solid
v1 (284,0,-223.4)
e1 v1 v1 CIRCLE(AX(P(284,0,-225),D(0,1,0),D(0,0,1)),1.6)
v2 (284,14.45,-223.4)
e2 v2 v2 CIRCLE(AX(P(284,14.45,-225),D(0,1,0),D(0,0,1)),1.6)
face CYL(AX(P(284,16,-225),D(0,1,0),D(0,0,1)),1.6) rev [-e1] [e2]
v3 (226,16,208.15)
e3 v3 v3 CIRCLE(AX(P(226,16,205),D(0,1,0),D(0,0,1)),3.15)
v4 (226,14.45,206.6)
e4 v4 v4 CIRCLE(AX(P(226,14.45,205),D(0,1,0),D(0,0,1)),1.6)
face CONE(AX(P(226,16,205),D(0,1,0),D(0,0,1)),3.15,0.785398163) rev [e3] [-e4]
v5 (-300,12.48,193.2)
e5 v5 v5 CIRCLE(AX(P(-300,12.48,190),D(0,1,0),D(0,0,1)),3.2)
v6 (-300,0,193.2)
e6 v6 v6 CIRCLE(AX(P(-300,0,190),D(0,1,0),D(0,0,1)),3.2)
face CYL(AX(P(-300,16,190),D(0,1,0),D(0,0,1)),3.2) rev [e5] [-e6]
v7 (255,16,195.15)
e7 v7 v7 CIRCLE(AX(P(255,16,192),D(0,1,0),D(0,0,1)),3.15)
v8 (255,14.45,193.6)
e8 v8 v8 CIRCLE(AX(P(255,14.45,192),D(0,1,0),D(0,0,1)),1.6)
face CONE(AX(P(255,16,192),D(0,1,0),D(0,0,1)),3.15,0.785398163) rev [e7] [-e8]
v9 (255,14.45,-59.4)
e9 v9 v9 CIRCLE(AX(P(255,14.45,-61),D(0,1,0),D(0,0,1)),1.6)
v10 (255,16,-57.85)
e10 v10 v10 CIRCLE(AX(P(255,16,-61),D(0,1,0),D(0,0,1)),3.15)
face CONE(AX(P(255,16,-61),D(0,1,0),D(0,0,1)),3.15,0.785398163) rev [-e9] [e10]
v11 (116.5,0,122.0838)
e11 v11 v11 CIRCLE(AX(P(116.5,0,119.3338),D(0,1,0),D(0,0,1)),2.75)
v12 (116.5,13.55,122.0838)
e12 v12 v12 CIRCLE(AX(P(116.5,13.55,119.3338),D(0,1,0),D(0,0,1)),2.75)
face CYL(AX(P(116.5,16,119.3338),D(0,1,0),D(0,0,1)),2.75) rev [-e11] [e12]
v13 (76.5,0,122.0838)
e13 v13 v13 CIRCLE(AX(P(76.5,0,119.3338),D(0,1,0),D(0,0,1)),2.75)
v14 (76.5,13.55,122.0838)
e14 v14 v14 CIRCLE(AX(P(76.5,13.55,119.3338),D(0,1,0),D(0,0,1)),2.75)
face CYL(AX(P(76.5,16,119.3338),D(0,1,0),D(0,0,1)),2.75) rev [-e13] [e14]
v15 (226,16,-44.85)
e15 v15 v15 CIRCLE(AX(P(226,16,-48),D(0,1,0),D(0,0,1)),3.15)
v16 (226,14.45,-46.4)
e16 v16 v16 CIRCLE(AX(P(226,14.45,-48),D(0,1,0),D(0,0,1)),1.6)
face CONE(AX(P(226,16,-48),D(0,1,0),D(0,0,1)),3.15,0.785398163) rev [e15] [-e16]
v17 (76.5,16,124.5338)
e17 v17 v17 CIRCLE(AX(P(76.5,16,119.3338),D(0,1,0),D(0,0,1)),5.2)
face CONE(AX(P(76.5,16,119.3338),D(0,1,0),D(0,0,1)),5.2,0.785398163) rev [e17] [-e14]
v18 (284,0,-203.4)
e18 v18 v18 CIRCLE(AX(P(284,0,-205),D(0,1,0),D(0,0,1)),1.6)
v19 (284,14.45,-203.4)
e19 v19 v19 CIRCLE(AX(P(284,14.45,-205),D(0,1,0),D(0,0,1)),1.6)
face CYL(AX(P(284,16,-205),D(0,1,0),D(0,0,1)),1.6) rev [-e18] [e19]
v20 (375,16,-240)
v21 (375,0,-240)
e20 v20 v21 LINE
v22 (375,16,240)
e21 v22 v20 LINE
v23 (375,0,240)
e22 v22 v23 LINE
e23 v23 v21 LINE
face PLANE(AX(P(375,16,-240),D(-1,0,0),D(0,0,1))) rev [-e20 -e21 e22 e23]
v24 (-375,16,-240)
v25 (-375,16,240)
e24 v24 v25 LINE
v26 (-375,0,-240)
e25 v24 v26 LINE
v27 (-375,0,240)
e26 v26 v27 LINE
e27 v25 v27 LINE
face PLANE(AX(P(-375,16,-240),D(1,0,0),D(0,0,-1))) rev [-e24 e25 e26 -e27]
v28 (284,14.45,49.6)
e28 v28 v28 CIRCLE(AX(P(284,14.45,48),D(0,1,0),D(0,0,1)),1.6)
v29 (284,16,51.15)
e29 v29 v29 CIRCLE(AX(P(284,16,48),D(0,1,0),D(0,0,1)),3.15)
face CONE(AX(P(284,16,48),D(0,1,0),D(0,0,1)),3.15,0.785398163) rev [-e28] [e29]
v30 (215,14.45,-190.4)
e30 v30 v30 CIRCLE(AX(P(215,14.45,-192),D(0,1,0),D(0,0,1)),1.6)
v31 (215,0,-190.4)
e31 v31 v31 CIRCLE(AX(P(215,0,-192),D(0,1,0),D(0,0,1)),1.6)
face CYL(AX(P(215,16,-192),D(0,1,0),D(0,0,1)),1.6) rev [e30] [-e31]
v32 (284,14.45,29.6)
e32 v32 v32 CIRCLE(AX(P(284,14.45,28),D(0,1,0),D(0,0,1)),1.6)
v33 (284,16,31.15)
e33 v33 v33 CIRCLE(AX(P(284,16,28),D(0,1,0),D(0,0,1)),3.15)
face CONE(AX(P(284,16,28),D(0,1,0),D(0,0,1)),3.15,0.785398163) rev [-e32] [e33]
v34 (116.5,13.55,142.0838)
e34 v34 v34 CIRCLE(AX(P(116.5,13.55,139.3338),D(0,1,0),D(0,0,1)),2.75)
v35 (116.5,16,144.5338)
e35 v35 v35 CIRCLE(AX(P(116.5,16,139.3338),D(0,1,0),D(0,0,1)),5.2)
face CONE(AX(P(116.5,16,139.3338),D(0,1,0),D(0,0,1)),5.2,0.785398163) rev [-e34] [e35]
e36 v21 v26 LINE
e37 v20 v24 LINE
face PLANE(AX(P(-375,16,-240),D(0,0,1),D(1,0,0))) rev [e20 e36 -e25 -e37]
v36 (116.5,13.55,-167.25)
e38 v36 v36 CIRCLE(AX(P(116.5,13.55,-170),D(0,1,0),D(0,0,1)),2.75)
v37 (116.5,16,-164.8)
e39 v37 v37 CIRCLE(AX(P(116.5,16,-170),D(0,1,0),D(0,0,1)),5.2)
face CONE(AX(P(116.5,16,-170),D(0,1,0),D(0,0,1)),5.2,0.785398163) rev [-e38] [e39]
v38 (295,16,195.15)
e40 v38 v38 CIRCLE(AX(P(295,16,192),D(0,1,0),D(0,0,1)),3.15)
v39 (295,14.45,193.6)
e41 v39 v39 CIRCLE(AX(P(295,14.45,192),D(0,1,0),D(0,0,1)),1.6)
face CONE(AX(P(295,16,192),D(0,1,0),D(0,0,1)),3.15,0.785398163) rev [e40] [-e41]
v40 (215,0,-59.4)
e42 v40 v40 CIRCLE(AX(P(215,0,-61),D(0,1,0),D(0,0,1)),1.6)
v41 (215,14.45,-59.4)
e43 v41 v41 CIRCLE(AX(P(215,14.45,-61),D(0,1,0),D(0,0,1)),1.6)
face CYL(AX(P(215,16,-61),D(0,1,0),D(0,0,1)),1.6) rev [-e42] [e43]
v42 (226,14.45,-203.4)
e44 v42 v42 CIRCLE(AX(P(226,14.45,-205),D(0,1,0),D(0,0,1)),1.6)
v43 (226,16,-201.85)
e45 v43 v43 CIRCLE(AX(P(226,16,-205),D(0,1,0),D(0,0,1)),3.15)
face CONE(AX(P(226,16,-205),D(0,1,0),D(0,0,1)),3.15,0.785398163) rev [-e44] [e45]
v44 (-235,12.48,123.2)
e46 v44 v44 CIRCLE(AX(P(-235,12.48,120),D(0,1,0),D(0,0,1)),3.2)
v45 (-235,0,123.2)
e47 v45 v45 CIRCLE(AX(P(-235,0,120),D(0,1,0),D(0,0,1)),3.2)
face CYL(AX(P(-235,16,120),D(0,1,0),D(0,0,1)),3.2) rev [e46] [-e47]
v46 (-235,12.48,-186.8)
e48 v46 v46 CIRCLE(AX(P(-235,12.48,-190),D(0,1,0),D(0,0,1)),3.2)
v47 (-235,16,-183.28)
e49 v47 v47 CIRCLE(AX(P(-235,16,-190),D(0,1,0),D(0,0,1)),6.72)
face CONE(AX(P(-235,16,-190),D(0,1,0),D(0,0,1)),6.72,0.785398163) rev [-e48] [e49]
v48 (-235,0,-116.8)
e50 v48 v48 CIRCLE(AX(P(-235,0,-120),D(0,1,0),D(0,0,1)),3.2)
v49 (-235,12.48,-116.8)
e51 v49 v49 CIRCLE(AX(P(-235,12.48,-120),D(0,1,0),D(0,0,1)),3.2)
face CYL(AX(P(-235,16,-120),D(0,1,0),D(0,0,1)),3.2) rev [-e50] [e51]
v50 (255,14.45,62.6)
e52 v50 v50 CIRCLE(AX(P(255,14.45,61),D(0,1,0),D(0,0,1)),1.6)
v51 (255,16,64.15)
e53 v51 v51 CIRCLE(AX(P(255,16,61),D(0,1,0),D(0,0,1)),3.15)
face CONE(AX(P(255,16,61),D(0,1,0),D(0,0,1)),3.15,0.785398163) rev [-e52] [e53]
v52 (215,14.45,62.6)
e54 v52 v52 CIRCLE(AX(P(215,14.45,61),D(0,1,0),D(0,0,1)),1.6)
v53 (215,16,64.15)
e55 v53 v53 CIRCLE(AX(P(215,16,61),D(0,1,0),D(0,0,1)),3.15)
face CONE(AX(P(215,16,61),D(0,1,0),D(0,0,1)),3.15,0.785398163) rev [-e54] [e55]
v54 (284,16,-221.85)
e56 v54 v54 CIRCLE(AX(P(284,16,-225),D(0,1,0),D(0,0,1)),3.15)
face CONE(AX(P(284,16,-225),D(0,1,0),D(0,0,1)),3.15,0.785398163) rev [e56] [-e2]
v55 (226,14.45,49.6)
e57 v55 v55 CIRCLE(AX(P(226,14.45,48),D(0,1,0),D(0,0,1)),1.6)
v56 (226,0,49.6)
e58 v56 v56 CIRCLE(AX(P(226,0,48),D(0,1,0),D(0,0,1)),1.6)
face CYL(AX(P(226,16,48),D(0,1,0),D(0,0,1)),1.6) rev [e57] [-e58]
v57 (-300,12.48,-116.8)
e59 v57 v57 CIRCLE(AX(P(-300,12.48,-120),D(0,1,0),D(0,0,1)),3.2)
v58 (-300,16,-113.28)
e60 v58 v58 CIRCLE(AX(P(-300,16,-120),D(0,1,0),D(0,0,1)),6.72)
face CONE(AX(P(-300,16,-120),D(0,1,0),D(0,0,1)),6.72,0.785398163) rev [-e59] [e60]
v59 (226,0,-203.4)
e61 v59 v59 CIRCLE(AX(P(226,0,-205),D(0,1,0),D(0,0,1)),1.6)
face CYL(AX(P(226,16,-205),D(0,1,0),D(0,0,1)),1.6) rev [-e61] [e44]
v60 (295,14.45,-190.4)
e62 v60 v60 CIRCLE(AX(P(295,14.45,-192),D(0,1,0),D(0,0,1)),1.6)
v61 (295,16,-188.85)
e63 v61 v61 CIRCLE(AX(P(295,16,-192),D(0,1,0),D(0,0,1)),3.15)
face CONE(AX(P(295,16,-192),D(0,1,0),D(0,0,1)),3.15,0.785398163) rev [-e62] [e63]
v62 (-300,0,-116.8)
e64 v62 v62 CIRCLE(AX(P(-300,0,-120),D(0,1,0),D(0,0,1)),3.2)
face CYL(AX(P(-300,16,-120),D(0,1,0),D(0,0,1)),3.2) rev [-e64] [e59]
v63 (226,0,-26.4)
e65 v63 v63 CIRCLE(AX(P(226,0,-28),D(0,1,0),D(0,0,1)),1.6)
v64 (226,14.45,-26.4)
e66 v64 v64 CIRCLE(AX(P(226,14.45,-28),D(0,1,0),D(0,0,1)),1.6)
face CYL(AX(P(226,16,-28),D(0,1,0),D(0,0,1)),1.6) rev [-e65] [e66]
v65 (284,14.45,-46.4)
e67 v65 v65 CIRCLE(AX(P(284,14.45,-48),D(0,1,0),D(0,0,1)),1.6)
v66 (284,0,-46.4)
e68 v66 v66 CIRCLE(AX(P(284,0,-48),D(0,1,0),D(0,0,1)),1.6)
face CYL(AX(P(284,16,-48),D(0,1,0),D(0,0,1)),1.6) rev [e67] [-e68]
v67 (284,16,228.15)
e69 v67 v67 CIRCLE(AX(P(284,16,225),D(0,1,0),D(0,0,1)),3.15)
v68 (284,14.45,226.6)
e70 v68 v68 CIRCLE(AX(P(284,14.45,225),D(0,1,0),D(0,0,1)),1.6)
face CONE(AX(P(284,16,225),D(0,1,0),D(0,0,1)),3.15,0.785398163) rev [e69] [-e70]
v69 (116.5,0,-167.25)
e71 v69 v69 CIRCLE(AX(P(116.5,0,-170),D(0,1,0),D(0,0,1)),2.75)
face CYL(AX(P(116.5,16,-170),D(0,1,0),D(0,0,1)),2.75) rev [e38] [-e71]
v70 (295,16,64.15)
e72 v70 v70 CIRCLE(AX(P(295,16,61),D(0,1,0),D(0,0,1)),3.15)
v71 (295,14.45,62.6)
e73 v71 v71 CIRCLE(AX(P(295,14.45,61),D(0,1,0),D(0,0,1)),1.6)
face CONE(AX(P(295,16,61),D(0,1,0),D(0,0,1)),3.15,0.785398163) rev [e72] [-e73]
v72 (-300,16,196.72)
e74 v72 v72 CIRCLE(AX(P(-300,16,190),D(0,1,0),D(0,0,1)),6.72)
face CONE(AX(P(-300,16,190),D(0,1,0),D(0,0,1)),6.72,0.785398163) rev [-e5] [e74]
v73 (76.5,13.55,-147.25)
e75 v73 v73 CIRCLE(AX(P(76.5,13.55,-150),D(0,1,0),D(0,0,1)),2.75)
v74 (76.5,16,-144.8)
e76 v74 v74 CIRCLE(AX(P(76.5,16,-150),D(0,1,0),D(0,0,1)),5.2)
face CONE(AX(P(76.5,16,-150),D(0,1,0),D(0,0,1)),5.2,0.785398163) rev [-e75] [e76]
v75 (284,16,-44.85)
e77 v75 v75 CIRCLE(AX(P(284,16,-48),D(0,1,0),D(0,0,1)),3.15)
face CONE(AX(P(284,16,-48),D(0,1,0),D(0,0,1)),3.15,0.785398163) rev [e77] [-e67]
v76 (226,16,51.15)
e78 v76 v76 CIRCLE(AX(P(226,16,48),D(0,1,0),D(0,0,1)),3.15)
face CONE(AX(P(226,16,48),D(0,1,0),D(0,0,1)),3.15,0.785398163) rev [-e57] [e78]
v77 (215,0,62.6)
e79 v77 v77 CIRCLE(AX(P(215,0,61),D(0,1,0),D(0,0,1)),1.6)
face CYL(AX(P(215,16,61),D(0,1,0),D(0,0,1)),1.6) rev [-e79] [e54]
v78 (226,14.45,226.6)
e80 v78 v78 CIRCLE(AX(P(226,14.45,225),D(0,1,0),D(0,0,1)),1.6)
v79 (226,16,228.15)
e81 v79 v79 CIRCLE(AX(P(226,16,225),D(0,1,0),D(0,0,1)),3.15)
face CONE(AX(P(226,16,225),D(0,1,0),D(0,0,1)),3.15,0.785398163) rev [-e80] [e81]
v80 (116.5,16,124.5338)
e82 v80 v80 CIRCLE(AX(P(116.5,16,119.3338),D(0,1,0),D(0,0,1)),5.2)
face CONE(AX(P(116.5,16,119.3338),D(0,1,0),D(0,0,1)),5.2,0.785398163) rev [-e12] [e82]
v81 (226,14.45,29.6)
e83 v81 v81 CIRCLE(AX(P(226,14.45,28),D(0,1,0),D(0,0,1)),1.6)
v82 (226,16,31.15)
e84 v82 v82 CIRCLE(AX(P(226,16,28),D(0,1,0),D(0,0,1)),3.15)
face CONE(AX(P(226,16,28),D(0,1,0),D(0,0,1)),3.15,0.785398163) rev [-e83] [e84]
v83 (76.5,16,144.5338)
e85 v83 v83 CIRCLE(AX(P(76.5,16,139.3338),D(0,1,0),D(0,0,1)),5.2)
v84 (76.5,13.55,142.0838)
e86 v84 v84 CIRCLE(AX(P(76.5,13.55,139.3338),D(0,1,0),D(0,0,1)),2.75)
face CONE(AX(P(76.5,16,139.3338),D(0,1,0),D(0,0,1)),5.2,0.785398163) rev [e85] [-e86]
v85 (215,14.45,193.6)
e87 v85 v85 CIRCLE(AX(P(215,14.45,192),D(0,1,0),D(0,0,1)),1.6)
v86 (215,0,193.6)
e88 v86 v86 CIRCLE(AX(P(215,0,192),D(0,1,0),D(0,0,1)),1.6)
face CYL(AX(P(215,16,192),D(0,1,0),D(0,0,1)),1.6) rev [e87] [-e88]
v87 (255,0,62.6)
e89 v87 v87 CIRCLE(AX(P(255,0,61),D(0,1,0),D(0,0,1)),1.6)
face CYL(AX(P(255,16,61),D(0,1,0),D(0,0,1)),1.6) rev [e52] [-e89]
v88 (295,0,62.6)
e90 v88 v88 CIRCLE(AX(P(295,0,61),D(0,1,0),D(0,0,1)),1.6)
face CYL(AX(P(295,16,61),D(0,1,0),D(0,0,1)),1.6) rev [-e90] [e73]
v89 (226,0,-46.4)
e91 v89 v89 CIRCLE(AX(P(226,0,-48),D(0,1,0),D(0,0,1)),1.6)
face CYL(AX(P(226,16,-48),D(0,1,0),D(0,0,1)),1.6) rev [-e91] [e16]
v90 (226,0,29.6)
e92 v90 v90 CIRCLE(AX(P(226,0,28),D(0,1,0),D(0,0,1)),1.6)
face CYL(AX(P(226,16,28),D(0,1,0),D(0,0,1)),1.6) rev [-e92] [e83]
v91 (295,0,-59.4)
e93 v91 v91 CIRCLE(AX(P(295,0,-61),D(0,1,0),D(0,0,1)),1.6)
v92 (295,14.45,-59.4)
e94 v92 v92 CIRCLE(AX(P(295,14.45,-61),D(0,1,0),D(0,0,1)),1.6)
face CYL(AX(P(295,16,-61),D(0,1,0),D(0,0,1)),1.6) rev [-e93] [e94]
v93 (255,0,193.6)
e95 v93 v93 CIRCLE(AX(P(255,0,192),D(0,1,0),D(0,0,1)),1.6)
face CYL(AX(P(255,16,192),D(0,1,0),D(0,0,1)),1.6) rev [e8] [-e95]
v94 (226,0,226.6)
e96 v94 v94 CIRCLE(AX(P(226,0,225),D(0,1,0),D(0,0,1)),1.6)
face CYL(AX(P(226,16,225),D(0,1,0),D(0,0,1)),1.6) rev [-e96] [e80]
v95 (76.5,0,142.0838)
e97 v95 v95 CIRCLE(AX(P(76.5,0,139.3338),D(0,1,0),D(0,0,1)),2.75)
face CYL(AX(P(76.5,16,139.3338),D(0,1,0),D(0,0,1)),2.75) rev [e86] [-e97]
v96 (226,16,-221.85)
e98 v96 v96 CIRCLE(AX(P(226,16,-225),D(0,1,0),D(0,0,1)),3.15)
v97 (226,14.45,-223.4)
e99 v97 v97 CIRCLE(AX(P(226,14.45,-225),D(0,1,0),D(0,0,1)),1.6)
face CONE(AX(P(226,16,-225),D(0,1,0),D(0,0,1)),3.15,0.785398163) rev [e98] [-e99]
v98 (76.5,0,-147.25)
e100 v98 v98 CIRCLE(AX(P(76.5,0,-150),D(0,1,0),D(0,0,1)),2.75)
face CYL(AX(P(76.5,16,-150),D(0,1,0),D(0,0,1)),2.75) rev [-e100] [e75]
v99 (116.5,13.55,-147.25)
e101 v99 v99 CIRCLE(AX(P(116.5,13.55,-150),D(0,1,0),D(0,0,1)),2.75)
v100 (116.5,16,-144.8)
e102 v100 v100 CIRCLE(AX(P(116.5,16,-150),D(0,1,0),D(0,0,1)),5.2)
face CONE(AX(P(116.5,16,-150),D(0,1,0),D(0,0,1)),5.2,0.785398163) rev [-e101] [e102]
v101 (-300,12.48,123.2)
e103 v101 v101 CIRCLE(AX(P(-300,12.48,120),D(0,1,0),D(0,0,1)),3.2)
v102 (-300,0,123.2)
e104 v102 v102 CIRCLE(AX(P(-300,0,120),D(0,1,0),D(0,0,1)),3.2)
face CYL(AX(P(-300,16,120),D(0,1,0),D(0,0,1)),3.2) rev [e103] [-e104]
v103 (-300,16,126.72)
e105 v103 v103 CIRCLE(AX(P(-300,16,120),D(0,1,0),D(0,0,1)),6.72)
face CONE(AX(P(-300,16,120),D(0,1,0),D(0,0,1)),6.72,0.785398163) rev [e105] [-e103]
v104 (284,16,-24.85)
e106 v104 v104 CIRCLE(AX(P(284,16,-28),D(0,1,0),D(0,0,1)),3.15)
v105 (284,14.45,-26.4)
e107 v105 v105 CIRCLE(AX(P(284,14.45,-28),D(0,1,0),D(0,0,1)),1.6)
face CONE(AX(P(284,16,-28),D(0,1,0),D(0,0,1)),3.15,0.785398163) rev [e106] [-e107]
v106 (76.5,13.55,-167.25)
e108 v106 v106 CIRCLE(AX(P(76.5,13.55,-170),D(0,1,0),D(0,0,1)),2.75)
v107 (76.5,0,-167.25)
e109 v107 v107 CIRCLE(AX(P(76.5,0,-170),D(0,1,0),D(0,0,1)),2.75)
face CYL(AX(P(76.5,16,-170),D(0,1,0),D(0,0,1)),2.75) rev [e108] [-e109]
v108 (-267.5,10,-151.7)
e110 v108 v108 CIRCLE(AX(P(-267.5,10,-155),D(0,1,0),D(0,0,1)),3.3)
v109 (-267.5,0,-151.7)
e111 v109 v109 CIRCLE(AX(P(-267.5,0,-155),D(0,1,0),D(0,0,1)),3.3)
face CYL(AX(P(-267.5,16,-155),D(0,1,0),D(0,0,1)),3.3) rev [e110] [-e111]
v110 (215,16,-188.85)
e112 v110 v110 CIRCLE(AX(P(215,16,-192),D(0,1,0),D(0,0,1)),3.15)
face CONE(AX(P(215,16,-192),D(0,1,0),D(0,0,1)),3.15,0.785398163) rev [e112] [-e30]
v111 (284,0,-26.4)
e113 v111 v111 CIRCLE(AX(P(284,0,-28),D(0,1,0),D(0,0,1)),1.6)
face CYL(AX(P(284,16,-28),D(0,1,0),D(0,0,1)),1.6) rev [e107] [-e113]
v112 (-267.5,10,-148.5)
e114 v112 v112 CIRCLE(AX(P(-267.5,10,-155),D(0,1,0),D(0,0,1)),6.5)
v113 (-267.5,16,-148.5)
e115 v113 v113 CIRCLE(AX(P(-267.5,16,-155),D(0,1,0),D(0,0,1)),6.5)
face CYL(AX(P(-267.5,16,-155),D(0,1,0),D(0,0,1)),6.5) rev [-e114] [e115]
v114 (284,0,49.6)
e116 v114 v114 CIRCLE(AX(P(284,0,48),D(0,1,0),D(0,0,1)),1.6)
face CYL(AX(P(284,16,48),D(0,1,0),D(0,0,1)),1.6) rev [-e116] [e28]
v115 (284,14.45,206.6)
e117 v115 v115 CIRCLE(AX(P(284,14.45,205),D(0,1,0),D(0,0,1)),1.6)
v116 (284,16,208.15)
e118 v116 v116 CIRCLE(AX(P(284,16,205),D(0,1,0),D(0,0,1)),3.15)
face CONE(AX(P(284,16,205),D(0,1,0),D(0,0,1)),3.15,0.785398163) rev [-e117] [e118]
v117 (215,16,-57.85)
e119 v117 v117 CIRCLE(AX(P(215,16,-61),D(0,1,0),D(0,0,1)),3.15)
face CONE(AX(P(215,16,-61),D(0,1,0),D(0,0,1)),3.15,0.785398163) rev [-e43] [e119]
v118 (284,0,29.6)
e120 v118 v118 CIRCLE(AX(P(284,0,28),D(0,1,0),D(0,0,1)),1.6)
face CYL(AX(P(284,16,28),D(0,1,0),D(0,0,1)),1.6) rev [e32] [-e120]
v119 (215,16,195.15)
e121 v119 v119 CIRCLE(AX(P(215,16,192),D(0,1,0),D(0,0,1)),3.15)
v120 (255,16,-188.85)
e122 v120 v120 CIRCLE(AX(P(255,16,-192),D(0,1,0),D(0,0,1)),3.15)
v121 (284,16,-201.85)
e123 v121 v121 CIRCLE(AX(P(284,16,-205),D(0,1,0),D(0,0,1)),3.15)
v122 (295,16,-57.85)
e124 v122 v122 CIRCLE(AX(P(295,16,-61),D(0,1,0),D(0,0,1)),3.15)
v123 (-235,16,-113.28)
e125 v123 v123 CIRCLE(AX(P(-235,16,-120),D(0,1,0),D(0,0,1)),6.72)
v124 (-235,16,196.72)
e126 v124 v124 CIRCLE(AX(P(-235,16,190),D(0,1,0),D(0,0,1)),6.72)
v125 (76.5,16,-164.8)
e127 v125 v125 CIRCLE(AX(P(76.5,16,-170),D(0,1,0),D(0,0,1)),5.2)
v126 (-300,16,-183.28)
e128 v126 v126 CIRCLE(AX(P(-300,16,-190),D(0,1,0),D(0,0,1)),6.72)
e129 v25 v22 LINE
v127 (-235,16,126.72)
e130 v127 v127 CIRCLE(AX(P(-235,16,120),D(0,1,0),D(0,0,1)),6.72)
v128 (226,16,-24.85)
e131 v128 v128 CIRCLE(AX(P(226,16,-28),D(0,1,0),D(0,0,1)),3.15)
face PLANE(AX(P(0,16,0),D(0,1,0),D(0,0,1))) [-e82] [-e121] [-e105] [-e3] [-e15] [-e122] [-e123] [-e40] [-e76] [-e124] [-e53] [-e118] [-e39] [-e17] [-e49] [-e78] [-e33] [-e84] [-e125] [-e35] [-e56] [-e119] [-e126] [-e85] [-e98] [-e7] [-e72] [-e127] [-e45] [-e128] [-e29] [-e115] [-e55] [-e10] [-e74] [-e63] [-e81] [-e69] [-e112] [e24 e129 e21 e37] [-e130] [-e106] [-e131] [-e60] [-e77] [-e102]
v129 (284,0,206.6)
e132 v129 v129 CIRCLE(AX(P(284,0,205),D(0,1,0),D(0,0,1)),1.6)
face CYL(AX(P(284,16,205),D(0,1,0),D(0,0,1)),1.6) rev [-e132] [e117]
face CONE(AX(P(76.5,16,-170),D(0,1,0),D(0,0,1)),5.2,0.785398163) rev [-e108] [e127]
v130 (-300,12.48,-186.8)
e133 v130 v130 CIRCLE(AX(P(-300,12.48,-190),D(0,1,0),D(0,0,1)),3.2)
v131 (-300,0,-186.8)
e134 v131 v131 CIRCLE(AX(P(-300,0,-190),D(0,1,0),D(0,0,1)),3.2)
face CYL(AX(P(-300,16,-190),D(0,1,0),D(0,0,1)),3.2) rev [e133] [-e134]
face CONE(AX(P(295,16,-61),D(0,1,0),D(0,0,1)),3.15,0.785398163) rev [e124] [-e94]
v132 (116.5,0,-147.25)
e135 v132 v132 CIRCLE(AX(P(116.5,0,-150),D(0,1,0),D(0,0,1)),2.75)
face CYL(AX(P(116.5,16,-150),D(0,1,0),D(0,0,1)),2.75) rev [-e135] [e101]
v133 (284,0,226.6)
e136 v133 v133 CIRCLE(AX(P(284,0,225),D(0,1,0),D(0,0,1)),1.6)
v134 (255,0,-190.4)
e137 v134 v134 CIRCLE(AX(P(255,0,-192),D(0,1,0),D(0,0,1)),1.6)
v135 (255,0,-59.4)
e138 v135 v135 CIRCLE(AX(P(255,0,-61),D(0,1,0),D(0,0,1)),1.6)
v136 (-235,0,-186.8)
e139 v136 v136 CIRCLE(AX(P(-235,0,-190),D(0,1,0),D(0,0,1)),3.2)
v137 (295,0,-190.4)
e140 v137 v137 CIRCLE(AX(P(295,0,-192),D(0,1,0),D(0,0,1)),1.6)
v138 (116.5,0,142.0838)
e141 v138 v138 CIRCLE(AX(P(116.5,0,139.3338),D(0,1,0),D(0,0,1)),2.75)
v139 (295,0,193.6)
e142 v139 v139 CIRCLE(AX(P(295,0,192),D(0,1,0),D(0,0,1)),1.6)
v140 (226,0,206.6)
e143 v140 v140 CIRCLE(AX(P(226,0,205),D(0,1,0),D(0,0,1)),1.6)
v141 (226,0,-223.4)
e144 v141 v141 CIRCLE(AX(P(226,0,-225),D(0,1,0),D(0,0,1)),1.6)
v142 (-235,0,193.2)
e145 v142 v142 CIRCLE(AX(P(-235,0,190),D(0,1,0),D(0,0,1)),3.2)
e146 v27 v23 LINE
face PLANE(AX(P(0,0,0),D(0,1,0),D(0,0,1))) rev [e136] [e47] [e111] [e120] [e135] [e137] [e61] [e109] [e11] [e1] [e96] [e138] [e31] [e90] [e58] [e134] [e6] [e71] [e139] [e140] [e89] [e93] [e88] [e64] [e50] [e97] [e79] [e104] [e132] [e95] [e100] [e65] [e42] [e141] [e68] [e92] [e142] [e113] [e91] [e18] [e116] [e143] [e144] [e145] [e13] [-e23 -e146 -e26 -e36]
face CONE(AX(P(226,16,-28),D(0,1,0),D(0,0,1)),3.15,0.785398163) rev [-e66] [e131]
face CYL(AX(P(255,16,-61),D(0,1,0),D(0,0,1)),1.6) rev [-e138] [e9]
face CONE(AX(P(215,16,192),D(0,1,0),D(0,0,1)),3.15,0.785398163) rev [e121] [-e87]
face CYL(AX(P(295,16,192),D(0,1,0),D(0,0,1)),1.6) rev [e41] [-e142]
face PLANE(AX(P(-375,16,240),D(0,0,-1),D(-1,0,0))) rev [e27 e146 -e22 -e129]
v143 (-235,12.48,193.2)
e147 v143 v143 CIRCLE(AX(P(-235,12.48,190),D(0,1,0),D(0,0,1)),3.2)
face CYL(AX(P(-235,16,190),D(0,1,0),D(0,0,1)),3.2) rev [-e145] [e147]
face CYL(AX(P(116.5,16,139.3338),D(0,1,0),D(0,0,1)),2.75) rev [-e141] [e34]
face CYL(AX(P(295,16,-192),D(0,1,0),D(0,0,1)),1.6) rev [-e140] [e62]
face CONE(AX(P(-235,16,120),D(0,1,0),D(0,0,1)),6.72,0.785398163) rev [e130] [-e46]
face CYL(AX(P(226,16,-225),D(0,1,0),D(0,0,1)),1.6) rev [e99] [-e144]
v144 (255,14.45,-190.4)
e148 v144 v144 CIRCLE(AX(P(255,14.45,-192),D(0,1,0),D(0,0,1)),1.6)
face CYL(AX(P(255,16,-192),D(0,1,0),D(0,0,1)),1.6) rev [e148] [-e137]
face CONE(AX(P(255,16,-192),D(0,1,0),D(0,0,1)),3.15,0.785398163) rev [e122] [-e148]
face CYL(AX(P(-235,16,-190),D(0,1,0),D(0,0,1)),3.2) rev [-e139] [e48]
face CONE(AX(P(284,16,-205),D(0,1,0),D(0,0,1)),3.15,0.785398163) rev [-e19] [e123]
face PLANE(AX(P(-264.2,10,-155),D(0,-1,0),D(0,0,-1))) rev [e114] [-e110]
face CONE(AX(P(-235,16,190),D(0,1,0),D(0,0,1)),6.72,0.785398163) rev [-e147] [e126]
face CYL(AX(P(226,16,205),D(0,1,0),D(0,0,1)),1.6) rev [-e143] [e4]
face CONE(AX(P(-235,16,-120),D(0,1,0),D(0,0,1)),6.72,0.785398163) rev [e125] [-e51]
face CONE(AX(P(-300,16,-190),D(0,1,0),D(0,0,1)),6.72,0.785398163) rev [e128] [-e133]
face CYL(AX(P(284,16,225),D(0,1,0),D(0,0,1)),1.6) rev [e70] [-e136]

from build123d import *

# Parameters (mm, degrees)
SZKIC1_W                                             = 750
SZKIC1_H                                             = 480
DODANIE_WYCI_GNI_CIE1_DEPTH                          = 16
POG_BIENIE_STO_KOWE_POD_M3_WKR_T_DO_2_COUNT          = 2
POG_BIENIE_STO_KOWE_POD_M3_WKR_T_DO_2_PITCH          = 34.785054262
POG_BIENIE_STO_KOWE_POD_M3_WKR_T_DO_3_COUNT          = 2
POG_BIENIE_STO_KOWE_POD_M3_WKR_T_DO_3_PITCH          = 76.485292704
POG_BIENIE_STO_KOWE_POD_M3_WKR_T_DO_4_COUNT          = 2
POG_BIENIE_STO_KOWE_POD_M3_WKR_T_DO_4_PITCH          = 70.213958726
POG_BIENIE_STO_KOWE_POD_M3_WKR_T_DO_5_COUNT          = 2
POG_BIENIE_STO_KOWE_POD_M3_WKR_T_DO_5_PITCH          = 40
POG_BIENIE_STO_KOWE_POD_M3_WKR_T_DO_6_COUNT          = 2
POG_BIENIE_STO_KOWE_POD_M3_WKR_T_DO_6_PITCH          = 80
POG_BIENIE_STO_KOWE_POD_M3_WKR_T_DO_7_COUNT          = 2
POG_BIENIE_STO_KOWE_POD_M3_WKR_T_DO_7_PITCH          = 17.029386366
POG_BIENIE_STO_KOWE_POD_M6_WKR_T_USTALAJ_D           = 6.4
POG_BIENIE_STO_KOWE_POD_M6_WKR_T_USTALAJ_DEPTH       = 26
POG_BIENIE_STO_KOWE_POD_M6_WKR_T_USTALAJ_CSINK_D     = 13.44
POG_BIENIE_STO_KOWE_POD_M6_WKR_T_USTALAJ_CSINK_ANGLE = 90
POG_BIENIE_STO_KOWE_POD_M6_WKR_T_USTALAJ_TIP         = 1.922753981
POG_BIENIE_STO_KOWE_POD_M5_WKR_T_DO_CZ_C_D           = 5.5
POG_BIENIE_STO_KOWE_POD_M5_WKR_T_DO_CZ_C_DEPTH       = 17
POG_BIENIE_STO_KOWE_POD_M5_WKR_T_DO_CZ_C_CSINK_D     = 10.4
POG_BIENIE_STO_KOWE_POD_M5_WKR_T_DO_CZ_C_CSINK_ANGLE = 90
POG_BIENIE_STO_KOWE_POD_M5_WKR_T_DO_CZ_C_TIP         = 1.652366702
POG_BIENIE_WALCOWE_POD_M6_WKR_T_DO_CZ_CI_D           = 6.6
POG_BIENIE_WALCOWE_POD_M6_WKR_T_DO_CZ_CI_CBORE_D     = 13
POG_BIENIE_WALCOWE_POD_M6_WKR_T_DO_CZ_CI_CBORE_DEPTH = 6


# Read off the part's stored shape, not the designer's step: Lustro2, Lustro3
with BuildPart() as part:
    # Szkic1 → Dodanie-wyciągnięcie1 (new body)
    with BuildSketch(Plane(origin=(0, 0, 0), x_dir=(1, 0, 0), z_dir=(0, 1, 0))):
        Rectangle(SZKIC1_W, SZKIC1_H)
    extrude(amount=DODANIE_WYCI_GNI_CIE1_DEPTH)

    # Szkic7 → Pogłębienie stożkowe pod M3 wkręt do części metalowych z łbem płaskim1 (revolve, cut)
    with BuildSketch(Plane(origin=(295, 16, -61), x_dir=(0, 0, 1), z_dir=(1, 0, 0))):
        Polygon((0, 0), (0, 40.96137699), (1.6, 40), (1.6, 1.55), (3.15, 0), align=None)
    pog_bienie_sto_kowe_pod_m3_wkr_t_do_cz_c = revolve(axis=Axis((295, 22.35, -61), (0, -1, 0)), mode=Mode.SUBTRACT)

    # Pog_bienie sto_kowe pod M3 wkr_t do  2: Pogłębienie stożkowe pod M3 wkręt do części metalowych z łbem płaskim1 ×2
    with Locations(*[Vector(-0.316227766016835, 0, 0.9486832980505148) * (i * POG_BIENIE_STO_KOWE_POD_M3_WKR_T_DO_2_PITCH) for i in range(1, POG_BIENIE_STO_KOWE_POD_M3_WKR_T_DO_2_COUNT)]):
        add(pog_bienie_sto_kowe_pod_m3_wkr_t_do_cz_c, mode=Mode.SUBTRACT)

    # Pog_bienie sto_kowe pod M3 wkr_t do  3: Pogłębienie stożkowe pod M3 wkręt do części metalowych z łbem płaskim1 ×2
    with Locations(*[Vector(-0.9021342216356464, 0, 0.43145549730400534) * (i * POG_BIENIE_STO_KOWE_POD_M3_WKR_T_DO_3_PITCH) for i in range(1, POG_BIENIE_STO_KOWE_POD_M3_WKR_T_DO_3_COUNT)]):
        add(pog_bienie_sto_kowe_pod_m3_wkr_t_do_cz_c, mode=Mode.SUBTRACT)

    # Pog_bienie sto_kowe pod M3 wkr_t do  4: Pogłębienie stożkowe pod M3 wkręt do części metalowych z łbem płaskim1 ×2
    with Locations(*[Vector(-0.9827105785204017, 0, 0.18514836986616307) * (i * POG_BIENIE_STO_KOWE_POD_M3_WKR_T_DO_4_PITCH) for i in range(1, POG_BIENIE_STO_KOWE_POD_M3_WKR_T_DO_4_COUNT)]):
        add(pog_bienie_sto_kowe_pod_m3_wkr_t_do_cz_c, mode=Mode.SUBTRACT)

    # Pog_bienie sto_kowe pod M3 wkr_t do  5: Pogłębienie stożkowe pod M3 wkręt do części metalowych z łbem płaskim1 ×2
    with Locations(*[(-i * POG_BIENIE_STO_KOWE_POD_M3_WKR_T_DO_5_PITCH, 0, 0) for i in range(1, POG_BIENIE_STO_KOWE_POD_M3_WKR_T_DO_5_COUNT)]):
        add(pog_bienie_sto_kowe_pod_m3_wkr_t_do_cz_c, mode=Mode.SUBTRACT)

    # Pog_bienie sto_kowe pod M3 wkr_t do  6: Pogłębienie stożkowe pod M3 wkręt do części metalowych z łbem płaskim1 ×2
    with Locations(*[(-i * POG_BIENIE_STO_KOWE_POD_M3_WKR_T_DO_6_PITCH, 0, 0) for i in range(1, POG_BIENIE_STO_KOWE_POD_M3_WKR_T_DO_6_COUNT)]):
        add(pog_bienie_sto_kowe_pod_m3_wkr_t_do_cz_c, mode=Mode.SUBTRACT)

    # Pog_bienie sto_kowe pod M3 wkr_t do  7: Pogłębienie stożkowe pod M3 wkręt do części metalowych z łbem płaskim1 ×2
    with Locations(*[Vector(-0.6459422414661697, 0, 0.763386285369118) * (i * POG_BIENIE_STO_KOWE_POD_M3_WKR_T_DO_7_PITCH) for i in range(1, POG_BIENIE_STO_KOWE_POD_M3_WKR_T_DO_7_COUNT)]):
        add(pog_bienie_sto_kowe_pod_m3_wkr_t_do_cz_c, mode=Mode.SUBTRACT)

    # Lustro2 outline → Lustro2 (revolve, cut)
    with BuildSketch(Plane(origin=(284, 0, -205), x_dir=(1, 0, 0), z_dir=(0, 0, 1))):
        Polygon((0, 0), (1.6, 0), (1.6, 14.45), (3.15, 16), (0, 16), align=None)
    revolve(axis=Axis((284, 0, -205), (0, 1, 0)), mode=Mode.SUBTRACT)

    # Lustro2 2 outline → Lustro2 2 (revolve, cut)
    with BuildSketch(Plane(origin=(215, 0, -192), x_dir=(1, 0, 0), z_dir=(0, 0, 1))):
        Polygon((0, 0), (1.6, 0), (1.6, 14.45), (3.15, 16), (0, 16), align=None)
    revolve(axis=Axis((215, 0, -192), (0, 1, 0)), mode=Mode.SUBTRACT)

    # Lustro2 3 outline → Lustro2 3 (revolve, cut)
    with BuildSketch(Plane(origin=(255, 0, -192), x_dir=(1, 0, 0), z_dir=(0, 0, 1))):
        Polygon((0, 0), (1.6, 0), (1.6, 14.45), (3.15, 16), (0, 16), align=None)
    revolve(axis=Axis((255, 0, -192), (0, 1, 0)), mode=Mode.SUBTRACT)

    # Lustro2 4 outline → Lustro2 4 (revolve, cut)
    with BuildSketch(Plane(origin=(226, 0, -205), x_dir=(1, 0, 0), z_dir=(0, 0, 1))):
        Polygon((0, 0), (1.6, 0), (1.6, 14.45), (3.15, 16), (0, 16), align=None)
    revolve(axis=Axis((226, 0, -205), (0, 1, 0)), mode=Mode.SUBTRACT)

    # Lustro2 5 outline → Lustro2 5 (revolve, cut)
    with BuildSketch(Plane(origin=(226, 0, -225), x_dir=(1, 0, 0), z_dir=(0, 0, 1))):
        Polygon((0, 0), (1.6, 0), (1.6, 14.45), (3.15, 16), (0, 16), align=None)
    revolve(axis=Axis((226, 0, -225), (0, 1, 0)), mode=Mode.SUBTRACT)

    # Lustro2 6 outline → Lustro2 6 (revolve, cut)
    with BuildSketch(Plane(origin=(284, 0, -225), x_dir=(1, 0, 0), z_dir=(0, 0, 1))):
        Polygon((0, 0), (1.6, 0), (1.6, 14.45), (3.15, 16), (0, 16), align=None)
    revolve(axis=Axis((284, 0, -225), (0, 1, 0)), mode=Mode.SUBTRACT)

    # Lustro2 7 outline → Lustro2 7 (revolve, cut)
    with BuildSketch(Plane(origin=(295, 0, -192), x_dir=(1, 0, 0), z_dir=(0, 0, 1))):
        Polygon((0, 0), (1.6, 0), (1.6, 14.45), (3.15, 16), (0, 16), align=None)
    revolve(axis=Axis((295, 0, -192), (0, 1, 0)), mode=Mode.SUBTRACT)

    # Lustro3 outline → Lustro3 (revolve, cut)
    with BuildSketch(Plane(origin=(284, 0, 48), x_dir=(1, 0, 0), z_dir=(0, 0, 1))):
        Polygon((0, 0), (1.6, 0), (1.6, 14.45), (3.15, 16), (0, 16), align=None)
    revolve(axis=Axis((284, 0, 48), (0, 1, 0)), mode=Mode.SUBTRACT)

    # Lustro3 2 outline → Lustro3 2 (revolve, cut)
    with BuildSketch(Plane(origin=(215, 0, 61), x_dir=(1, 0, 0), z_dir=(0, 0, 1))):
        Polygon((0, 0), (1.6, 0), (1.6, 14.45), (3.15, 16), (0, 16), align=None)
    revolve(axis=Axis((215, 0, 61), (0, 1, 0)), mode=Mode.SUBTRACT)

    # Lustro3 3 outline → Lustro3 3 (revolve, cut)
    with BuildSketch(Plane(origin=(255, 0, 61), x_dir=(1, 0, 0), z_dir=(0, 0, 1))):
        Polygon((0, 0), (1.6, 0), (1.6, 14.45), (3.15, 16), (0, 16), align=None)
    revolve(axis=Axis((255, 0, 61), (0, 1, 0)), mode=Mode.SUBTRACT)

    # Lustro3 4 outline → Lustro3 4 (revolve, cut)
    with BuildSketch(Plane(origin=(226, 0, 48), x_dir=(1, 0, 0), z_dir=(0, 0, 1))):
        Polygon((0, 0), (1.6, 0), (1.6, 14.45), (3.15, 16), (0, 16), align=None)
    revolve(axis=Axis((226, 0, 48), (0, 1, 0)), mode=Mode.SUBTRACT)

    # Lustro3 5 outline → Lustro3 5 (revolve, cut)
    with BuildSketch(Plane(origin=(226, 0, 28), x_dir=(1, 0, 0), z_dir=(0, 0, 1))):
        Polygon((0, 0), (1.6, 0), (1.6, 14.45), (3.15, 16), (0, 16), align=None)
    revolve(axis=Axis((226, 0, 28), (0, 1, 0)), mode=Mode.SUBTRACT)

    # Lustro3 6 outline → Lustro3 6 (revolve, cut)
    with BuildSketch(Plane(origin=(284, 0, 28), x_dir=(1, 0, 0), z_dir=(0, 0, 1))):
        Polygon((0, 0), (1.6, 0), (1.6, 14.45), (3.15, 16), (0, 16), align=None)
    revolve(axis=Axis((284, 0, 28), (0, 1, 0)), mode=Mode.SUBTRACT)

    # Lustro3 7 outline → Lustro3 7 (revolve, cut)
    with BuildSketch(Plane(origin=(295, 0, 61), x_dir=(1, 0, 0), z_dir=(0, 0, 1))):
        Polygon((0, 0), (1.6, 0), (1.6, 14.45), (3.15, 16), (0, 16), align=None)
    revolve(axis=Axis((295, 0, 61), (0, 1, 0)), mode=Mode.SUBTRACT)

    # Lustro3 8 outline → Lustro3 8 (revolve, cut)
    with BuildSketch(Plane(origin=(284, 0, 205), x_dir=(1, 0, 0), z_dir=(0, 0, 1))):
        Polygon((0, 0), (1.6, 0), (1.6, 14.45), (3.15, 16), (0, 16), align=None)
    revolve(axis=Axis((284, 0, 205), (0, 1, 0)), mode=Mode.SUBTRACT)

    # Lustro3 9 outline → Lustro3 9 (revolve, cut)
    with BuildSketch(Plane(origin=(215, 0, 192), x_dir=(1, 0, 0), z_dir=(0, 0, 1))):
        Polygon((0, 0), (1.6, 0), (1.6, 14.45), (3.15, 16), (0, 16), align=None)
    revolve(axis=Axis((215, 0, 192), (0, 1, 0)), mode=Mode.SUBTRACT)

    # Lustro3 10 outline → Lustro3 10 (revolve, cut)
    with BuildSketch(Plane(origin=(255, 0, 192), x_dir=(1, 0, 0), z_dir=(0, 0, 1))):
        Polygon((0, 0), (1.6, 0), (1.6, 14.45), (3.15, 16), (0, 16), align=None)
    revolve(axis=Axis((255, 0, 192), (0, 1, 0)), mode=Mode.SUBTRACT)

    # Lustro3 11 outline → Lustro3 11 (revolve, cut)
    with BuildSketch(Plane(origin=(226, 0, 205), x_dir=(1, 0, 0), z_dir=(0, 0, 1))):
        Polygon((0, 0), (1.6, 0), (1.6, 14.45), (3.15, 16), (0, 16), align=None)
    revolve(axis=Axis((226, 0, 205), (0, 1, 0)), mode=Mode.SUBTRACT)

    # Lustro3 12 outline → Lustro3 12 (revolve, cut)
    with BuildSketch(Plane(origin=(226, 0, 225), x_dir=(1, 0, 0), z_dir=(0, 0, 1))):
        Polygon((0, 0), (1.6, 0), (1.6, 14.45), (3.15, 16), (0, 16), align=None)
    revolve(axis=Axis((226, 0, 225), (0, 1, 0)), mode=Mode.SUBTRACT)

    # Lustro3 13 outline → Lustro3 13 (revolve, cut)
    with BuildSketch(Plane(origin=(284, 0, 225), x_dir=(1, 0, 0), z_dir=(0, 0, 1))):
        Polygon((0, 0), (1.6, 0), (1.6, 14.45), (3.15, 16), (0, 16), align=None)
    revolve(axis=Axis((284, 0, 225), (0, 1, 0)), mode=Mode.SUBTRACT)

    # Lustro3 14 outline → Lustro3 14 (revolve, cut)
    with BuildSketch(Plane(origin=(295, 0, 192), x_dir=(1, 0, 0), z_dir=(0, 0, 1))):
        Polygon((0, 0), (1.6, 0), (1.6, 14.45), (3.15, 16), (0, 16), align=None)
    revolve(axis=Axis((295, 0, 192), (0, 1, 0)), mode=Mode.SUBTRACT)

    # Lustro3 15 outline → Lustro3 15 (revolve, cut)
    with BuildSketch(Plane(origin=(-300, 0, 190), x_dir=(1, 0, 0), z_dir=(0, 0, 1))):
        Polygon((0, 0), (3.2, 0), (3.2, 12.48), (6.72, 16), (0, 16), align=None)
    revolve(axis=Axis((-300, 0, 190), (0, 1, 0)), mode=Mode.SUBTRACT)

    # Lustro3 16 outline → Lustro3 16 (revolve, cut)
    with BuildSketch(Plane(origin=(-300, 0, 120), x_dir=(1, 0, 0), z_dir=(0, 0, 1))):
        Polygon((0, 0), (3.2, 0), (3.2, 12.48), (6.72, 16), (0, 16), align=None)
    revolve(axis=Axis((-300, 0, 120), (0, 1, 0)), mode=Mode.SUBTRACT)

    # Lustro3 17 outline → Lustro3 17 (revolve, cut)
    with BuildSketch(Plane(origin=(-235, 0, 120), x_dir=(1, 0, 0), z_dir=(0, 0, 1))):
        Polygon((0, 0), (3.2, 0), (3.2, 12.48), (6.72, 16), (0, 16), align=None)
    revolve(axis=Axis((-235, 0, 120), (0, 1, 0)), mode=Mode.SUBTRACT)

    # Lustro3 18 outline → Lustro3 18 (revolve, cut)
    with BuildSketch(Plane(origin=(-235, 0, 190), x_dir=(1, 0, 0), z_dir=(0, 0, 1))):
        Polygon((0, 0), (3.2, 0), (3.2, 12.48), (6.72, 16), (0, 16), align=None)
    revolve(axis=Axis((-235, 0, 190), (0, 1, 0)), mode=Mode.SUBTRACT)

    # Lustro3 19 outline → Lustro3 19 (revolve, cut)
    with BuildSketch(Plane(origin=(116.5, 0, 139.3338), x_dir=(1, 0, 0), z_dir=(0, 0, 1))):
        Polygon((0, 0), (2.75, 0), (2.75, 13.55), (5.2, 16), (0, 16), align=None)
    revolve(axis=Axis((116.5, 0, 139.3338), (0, 1, 0)), mode=Mode.SUBTRACT)

    # Lustro3 20 outline → Lustro3 20 (revolve, cut)
    with BuildSketch(Plane(origin=(116.5, 0, 119.3338), x_dir=(1, 0, 0), z_dir=(0, 0, 1))):
        Polygon((0, 0), (2.75, 0), (2.75, 13.55), (5.2, 16), (0, 16), align=None)
    revolve(axis=Axis((116.5, 0, 119.3338), (0, 1, 0)), mode=Mode.SUBTRACT)

    # Lustro3 21 outline → Lustro3 21 (revolve, cut)
    with BuildSketch(Plane(origin=(76.5, 0, 119.3338), x_dir=(1, 0, 0), z_dir=(0, 0, 1))):
        Polygon((0, 0), (2.75, 0), (2.75, 13.55), (5.2, 16), (0, 16), align=None)
    revolve(axis=Axis((76.5, 0, 119.3338), (0, 1, 0)), mode=Mode.SUBTRACT)

    # Lustro3 22 outline → Lustro3 22 (revolve, cut)
    with BuildSketch(Plane(origin=(76.5, 0, 139.3338), x_dir=(1, 0, 0), z_dir=(0, 0, 1))):
        Polygon((0, 0), (2.75, 0), (2.75, 13.55), (5.2, 16), (0, 16), align=None)
    revolve(axis=Axis((76.5, 0, 139.3338), (0, 1, 0)), mode=Mode.SUBTRACT)

    # Pogłębienie stożkowe pod M6 Wkręt ustalający1
    with Locations(Plane(origin=(0, 16, 0), x_dir=(1, 0, 0), z_dir=(0, 1, 0))):
        with Locations((-235, 190), (-235, 120), (-300, 120), (-300, 190)):
            CounterSinkHole(POG_BIENIE_STO_KOWE_POD_M6_WKR_T_USTALAJ_D / 2, POG_BIENIE_STO_KOWE_POD_M6_WKR_T_USTALAJ_CSINK_D / 2, depth=POG_BIENIE_STO_KOWE_POD_M6_WKR_T_USTALAJ_DEPTH, counter_sink_angle=POG_BIENIE_STO_KOWE_POD_M6_WKR_T_USTALAJ_CSINK_ANGLE)
            with Locations((0, 0, -(POG_BIENIE_STO_KOWE_POD_M6_WKR_T_USTALAJ_DEPTH + POG_BIENIE_STO_KOWE_POD_M6_WKR_T_USTALAJ_TIP / 2))):  # 118° drill point
                Cone(0, POG_BIENIE_STO_KOWE_POD_M6_WKR_T_USTALAJ_D / 2, POG_BIENIE_STO_KOWE_POD_M6_WKR_T_USTALAJ_TIP, mode=Mode.SUBTRACT)

    # Pogłębienie stożkowe pod M5 wkręt do części metalowych z łbem soczewkowym2
    with Locations(Plane(origin=(0, 16, 0), x_dir=(1, 0, 0), z_dir=(0, 1, 0))):
        with Locations((76.5, 170), (76.5, 150), (116.5, 150), (116.5, 170)):
            CounterSinkHole(POG_BIENIE_STO_KOWE_POD_M5_WKR_T_DO_CZ_C_D / 2, POG_BIENIE_STO_KOWE_POD_M5_WKR_T_DO_CZ_C_CSINK_D / 2, depth=POG_BIENIE_STO_KOWE_POD_M5_WKR_T_DO_CZ_C_DEPTH, counter_sink_angle=POG_BIENIE_STO_KOWE_POD_M5_WKR_T_DO_CZ_C_CSINK_ANGLE)
            with Locations((0, 0, -(POG_BIENIE_STO_KOWE_POD_M5_WKR_T_DO_CZ_C_DEPTH + POG_BIENIE_STO_KOWE_POD_M5_WKR_T_DO_CZ_C_TIP / 2))):  # 118° drill point
                Cone(0, POG_BIENIE_STO_KOWE_POD_M5_WKR_T_DO_CZ_C_D / 2, POG_BIENIE_STO_KOWE_POD_M5_WKR_T_DO_CZ_C_TIP, mode=Mode.SUBTRACT)

    # Pogłębienie walcowe pod M6 wkręt do części metalowych z łbem stożkowym ściętym1 (through all)
    with Locations(Plane(origin=(0, 16, 0), x_dir=(1, 0, 0), z_dir=(0, 1, 0))):
        with Locations((-267.5, 155)):
            CounterBoreHole(POG_BIENIE_WALCOWE_POD_M6_WKR_T_DO_CZ_CI_D / 2, POG_BIENIE_WALCOWE_POD_M6_WKR_T_DO_CZ_CI_CBORE_D / 2, POG_BIENIE_WALCOWE_POD_M6_WKR_T_DO_CZ_CI_CBORE_DEPTH)


solid = part.part
